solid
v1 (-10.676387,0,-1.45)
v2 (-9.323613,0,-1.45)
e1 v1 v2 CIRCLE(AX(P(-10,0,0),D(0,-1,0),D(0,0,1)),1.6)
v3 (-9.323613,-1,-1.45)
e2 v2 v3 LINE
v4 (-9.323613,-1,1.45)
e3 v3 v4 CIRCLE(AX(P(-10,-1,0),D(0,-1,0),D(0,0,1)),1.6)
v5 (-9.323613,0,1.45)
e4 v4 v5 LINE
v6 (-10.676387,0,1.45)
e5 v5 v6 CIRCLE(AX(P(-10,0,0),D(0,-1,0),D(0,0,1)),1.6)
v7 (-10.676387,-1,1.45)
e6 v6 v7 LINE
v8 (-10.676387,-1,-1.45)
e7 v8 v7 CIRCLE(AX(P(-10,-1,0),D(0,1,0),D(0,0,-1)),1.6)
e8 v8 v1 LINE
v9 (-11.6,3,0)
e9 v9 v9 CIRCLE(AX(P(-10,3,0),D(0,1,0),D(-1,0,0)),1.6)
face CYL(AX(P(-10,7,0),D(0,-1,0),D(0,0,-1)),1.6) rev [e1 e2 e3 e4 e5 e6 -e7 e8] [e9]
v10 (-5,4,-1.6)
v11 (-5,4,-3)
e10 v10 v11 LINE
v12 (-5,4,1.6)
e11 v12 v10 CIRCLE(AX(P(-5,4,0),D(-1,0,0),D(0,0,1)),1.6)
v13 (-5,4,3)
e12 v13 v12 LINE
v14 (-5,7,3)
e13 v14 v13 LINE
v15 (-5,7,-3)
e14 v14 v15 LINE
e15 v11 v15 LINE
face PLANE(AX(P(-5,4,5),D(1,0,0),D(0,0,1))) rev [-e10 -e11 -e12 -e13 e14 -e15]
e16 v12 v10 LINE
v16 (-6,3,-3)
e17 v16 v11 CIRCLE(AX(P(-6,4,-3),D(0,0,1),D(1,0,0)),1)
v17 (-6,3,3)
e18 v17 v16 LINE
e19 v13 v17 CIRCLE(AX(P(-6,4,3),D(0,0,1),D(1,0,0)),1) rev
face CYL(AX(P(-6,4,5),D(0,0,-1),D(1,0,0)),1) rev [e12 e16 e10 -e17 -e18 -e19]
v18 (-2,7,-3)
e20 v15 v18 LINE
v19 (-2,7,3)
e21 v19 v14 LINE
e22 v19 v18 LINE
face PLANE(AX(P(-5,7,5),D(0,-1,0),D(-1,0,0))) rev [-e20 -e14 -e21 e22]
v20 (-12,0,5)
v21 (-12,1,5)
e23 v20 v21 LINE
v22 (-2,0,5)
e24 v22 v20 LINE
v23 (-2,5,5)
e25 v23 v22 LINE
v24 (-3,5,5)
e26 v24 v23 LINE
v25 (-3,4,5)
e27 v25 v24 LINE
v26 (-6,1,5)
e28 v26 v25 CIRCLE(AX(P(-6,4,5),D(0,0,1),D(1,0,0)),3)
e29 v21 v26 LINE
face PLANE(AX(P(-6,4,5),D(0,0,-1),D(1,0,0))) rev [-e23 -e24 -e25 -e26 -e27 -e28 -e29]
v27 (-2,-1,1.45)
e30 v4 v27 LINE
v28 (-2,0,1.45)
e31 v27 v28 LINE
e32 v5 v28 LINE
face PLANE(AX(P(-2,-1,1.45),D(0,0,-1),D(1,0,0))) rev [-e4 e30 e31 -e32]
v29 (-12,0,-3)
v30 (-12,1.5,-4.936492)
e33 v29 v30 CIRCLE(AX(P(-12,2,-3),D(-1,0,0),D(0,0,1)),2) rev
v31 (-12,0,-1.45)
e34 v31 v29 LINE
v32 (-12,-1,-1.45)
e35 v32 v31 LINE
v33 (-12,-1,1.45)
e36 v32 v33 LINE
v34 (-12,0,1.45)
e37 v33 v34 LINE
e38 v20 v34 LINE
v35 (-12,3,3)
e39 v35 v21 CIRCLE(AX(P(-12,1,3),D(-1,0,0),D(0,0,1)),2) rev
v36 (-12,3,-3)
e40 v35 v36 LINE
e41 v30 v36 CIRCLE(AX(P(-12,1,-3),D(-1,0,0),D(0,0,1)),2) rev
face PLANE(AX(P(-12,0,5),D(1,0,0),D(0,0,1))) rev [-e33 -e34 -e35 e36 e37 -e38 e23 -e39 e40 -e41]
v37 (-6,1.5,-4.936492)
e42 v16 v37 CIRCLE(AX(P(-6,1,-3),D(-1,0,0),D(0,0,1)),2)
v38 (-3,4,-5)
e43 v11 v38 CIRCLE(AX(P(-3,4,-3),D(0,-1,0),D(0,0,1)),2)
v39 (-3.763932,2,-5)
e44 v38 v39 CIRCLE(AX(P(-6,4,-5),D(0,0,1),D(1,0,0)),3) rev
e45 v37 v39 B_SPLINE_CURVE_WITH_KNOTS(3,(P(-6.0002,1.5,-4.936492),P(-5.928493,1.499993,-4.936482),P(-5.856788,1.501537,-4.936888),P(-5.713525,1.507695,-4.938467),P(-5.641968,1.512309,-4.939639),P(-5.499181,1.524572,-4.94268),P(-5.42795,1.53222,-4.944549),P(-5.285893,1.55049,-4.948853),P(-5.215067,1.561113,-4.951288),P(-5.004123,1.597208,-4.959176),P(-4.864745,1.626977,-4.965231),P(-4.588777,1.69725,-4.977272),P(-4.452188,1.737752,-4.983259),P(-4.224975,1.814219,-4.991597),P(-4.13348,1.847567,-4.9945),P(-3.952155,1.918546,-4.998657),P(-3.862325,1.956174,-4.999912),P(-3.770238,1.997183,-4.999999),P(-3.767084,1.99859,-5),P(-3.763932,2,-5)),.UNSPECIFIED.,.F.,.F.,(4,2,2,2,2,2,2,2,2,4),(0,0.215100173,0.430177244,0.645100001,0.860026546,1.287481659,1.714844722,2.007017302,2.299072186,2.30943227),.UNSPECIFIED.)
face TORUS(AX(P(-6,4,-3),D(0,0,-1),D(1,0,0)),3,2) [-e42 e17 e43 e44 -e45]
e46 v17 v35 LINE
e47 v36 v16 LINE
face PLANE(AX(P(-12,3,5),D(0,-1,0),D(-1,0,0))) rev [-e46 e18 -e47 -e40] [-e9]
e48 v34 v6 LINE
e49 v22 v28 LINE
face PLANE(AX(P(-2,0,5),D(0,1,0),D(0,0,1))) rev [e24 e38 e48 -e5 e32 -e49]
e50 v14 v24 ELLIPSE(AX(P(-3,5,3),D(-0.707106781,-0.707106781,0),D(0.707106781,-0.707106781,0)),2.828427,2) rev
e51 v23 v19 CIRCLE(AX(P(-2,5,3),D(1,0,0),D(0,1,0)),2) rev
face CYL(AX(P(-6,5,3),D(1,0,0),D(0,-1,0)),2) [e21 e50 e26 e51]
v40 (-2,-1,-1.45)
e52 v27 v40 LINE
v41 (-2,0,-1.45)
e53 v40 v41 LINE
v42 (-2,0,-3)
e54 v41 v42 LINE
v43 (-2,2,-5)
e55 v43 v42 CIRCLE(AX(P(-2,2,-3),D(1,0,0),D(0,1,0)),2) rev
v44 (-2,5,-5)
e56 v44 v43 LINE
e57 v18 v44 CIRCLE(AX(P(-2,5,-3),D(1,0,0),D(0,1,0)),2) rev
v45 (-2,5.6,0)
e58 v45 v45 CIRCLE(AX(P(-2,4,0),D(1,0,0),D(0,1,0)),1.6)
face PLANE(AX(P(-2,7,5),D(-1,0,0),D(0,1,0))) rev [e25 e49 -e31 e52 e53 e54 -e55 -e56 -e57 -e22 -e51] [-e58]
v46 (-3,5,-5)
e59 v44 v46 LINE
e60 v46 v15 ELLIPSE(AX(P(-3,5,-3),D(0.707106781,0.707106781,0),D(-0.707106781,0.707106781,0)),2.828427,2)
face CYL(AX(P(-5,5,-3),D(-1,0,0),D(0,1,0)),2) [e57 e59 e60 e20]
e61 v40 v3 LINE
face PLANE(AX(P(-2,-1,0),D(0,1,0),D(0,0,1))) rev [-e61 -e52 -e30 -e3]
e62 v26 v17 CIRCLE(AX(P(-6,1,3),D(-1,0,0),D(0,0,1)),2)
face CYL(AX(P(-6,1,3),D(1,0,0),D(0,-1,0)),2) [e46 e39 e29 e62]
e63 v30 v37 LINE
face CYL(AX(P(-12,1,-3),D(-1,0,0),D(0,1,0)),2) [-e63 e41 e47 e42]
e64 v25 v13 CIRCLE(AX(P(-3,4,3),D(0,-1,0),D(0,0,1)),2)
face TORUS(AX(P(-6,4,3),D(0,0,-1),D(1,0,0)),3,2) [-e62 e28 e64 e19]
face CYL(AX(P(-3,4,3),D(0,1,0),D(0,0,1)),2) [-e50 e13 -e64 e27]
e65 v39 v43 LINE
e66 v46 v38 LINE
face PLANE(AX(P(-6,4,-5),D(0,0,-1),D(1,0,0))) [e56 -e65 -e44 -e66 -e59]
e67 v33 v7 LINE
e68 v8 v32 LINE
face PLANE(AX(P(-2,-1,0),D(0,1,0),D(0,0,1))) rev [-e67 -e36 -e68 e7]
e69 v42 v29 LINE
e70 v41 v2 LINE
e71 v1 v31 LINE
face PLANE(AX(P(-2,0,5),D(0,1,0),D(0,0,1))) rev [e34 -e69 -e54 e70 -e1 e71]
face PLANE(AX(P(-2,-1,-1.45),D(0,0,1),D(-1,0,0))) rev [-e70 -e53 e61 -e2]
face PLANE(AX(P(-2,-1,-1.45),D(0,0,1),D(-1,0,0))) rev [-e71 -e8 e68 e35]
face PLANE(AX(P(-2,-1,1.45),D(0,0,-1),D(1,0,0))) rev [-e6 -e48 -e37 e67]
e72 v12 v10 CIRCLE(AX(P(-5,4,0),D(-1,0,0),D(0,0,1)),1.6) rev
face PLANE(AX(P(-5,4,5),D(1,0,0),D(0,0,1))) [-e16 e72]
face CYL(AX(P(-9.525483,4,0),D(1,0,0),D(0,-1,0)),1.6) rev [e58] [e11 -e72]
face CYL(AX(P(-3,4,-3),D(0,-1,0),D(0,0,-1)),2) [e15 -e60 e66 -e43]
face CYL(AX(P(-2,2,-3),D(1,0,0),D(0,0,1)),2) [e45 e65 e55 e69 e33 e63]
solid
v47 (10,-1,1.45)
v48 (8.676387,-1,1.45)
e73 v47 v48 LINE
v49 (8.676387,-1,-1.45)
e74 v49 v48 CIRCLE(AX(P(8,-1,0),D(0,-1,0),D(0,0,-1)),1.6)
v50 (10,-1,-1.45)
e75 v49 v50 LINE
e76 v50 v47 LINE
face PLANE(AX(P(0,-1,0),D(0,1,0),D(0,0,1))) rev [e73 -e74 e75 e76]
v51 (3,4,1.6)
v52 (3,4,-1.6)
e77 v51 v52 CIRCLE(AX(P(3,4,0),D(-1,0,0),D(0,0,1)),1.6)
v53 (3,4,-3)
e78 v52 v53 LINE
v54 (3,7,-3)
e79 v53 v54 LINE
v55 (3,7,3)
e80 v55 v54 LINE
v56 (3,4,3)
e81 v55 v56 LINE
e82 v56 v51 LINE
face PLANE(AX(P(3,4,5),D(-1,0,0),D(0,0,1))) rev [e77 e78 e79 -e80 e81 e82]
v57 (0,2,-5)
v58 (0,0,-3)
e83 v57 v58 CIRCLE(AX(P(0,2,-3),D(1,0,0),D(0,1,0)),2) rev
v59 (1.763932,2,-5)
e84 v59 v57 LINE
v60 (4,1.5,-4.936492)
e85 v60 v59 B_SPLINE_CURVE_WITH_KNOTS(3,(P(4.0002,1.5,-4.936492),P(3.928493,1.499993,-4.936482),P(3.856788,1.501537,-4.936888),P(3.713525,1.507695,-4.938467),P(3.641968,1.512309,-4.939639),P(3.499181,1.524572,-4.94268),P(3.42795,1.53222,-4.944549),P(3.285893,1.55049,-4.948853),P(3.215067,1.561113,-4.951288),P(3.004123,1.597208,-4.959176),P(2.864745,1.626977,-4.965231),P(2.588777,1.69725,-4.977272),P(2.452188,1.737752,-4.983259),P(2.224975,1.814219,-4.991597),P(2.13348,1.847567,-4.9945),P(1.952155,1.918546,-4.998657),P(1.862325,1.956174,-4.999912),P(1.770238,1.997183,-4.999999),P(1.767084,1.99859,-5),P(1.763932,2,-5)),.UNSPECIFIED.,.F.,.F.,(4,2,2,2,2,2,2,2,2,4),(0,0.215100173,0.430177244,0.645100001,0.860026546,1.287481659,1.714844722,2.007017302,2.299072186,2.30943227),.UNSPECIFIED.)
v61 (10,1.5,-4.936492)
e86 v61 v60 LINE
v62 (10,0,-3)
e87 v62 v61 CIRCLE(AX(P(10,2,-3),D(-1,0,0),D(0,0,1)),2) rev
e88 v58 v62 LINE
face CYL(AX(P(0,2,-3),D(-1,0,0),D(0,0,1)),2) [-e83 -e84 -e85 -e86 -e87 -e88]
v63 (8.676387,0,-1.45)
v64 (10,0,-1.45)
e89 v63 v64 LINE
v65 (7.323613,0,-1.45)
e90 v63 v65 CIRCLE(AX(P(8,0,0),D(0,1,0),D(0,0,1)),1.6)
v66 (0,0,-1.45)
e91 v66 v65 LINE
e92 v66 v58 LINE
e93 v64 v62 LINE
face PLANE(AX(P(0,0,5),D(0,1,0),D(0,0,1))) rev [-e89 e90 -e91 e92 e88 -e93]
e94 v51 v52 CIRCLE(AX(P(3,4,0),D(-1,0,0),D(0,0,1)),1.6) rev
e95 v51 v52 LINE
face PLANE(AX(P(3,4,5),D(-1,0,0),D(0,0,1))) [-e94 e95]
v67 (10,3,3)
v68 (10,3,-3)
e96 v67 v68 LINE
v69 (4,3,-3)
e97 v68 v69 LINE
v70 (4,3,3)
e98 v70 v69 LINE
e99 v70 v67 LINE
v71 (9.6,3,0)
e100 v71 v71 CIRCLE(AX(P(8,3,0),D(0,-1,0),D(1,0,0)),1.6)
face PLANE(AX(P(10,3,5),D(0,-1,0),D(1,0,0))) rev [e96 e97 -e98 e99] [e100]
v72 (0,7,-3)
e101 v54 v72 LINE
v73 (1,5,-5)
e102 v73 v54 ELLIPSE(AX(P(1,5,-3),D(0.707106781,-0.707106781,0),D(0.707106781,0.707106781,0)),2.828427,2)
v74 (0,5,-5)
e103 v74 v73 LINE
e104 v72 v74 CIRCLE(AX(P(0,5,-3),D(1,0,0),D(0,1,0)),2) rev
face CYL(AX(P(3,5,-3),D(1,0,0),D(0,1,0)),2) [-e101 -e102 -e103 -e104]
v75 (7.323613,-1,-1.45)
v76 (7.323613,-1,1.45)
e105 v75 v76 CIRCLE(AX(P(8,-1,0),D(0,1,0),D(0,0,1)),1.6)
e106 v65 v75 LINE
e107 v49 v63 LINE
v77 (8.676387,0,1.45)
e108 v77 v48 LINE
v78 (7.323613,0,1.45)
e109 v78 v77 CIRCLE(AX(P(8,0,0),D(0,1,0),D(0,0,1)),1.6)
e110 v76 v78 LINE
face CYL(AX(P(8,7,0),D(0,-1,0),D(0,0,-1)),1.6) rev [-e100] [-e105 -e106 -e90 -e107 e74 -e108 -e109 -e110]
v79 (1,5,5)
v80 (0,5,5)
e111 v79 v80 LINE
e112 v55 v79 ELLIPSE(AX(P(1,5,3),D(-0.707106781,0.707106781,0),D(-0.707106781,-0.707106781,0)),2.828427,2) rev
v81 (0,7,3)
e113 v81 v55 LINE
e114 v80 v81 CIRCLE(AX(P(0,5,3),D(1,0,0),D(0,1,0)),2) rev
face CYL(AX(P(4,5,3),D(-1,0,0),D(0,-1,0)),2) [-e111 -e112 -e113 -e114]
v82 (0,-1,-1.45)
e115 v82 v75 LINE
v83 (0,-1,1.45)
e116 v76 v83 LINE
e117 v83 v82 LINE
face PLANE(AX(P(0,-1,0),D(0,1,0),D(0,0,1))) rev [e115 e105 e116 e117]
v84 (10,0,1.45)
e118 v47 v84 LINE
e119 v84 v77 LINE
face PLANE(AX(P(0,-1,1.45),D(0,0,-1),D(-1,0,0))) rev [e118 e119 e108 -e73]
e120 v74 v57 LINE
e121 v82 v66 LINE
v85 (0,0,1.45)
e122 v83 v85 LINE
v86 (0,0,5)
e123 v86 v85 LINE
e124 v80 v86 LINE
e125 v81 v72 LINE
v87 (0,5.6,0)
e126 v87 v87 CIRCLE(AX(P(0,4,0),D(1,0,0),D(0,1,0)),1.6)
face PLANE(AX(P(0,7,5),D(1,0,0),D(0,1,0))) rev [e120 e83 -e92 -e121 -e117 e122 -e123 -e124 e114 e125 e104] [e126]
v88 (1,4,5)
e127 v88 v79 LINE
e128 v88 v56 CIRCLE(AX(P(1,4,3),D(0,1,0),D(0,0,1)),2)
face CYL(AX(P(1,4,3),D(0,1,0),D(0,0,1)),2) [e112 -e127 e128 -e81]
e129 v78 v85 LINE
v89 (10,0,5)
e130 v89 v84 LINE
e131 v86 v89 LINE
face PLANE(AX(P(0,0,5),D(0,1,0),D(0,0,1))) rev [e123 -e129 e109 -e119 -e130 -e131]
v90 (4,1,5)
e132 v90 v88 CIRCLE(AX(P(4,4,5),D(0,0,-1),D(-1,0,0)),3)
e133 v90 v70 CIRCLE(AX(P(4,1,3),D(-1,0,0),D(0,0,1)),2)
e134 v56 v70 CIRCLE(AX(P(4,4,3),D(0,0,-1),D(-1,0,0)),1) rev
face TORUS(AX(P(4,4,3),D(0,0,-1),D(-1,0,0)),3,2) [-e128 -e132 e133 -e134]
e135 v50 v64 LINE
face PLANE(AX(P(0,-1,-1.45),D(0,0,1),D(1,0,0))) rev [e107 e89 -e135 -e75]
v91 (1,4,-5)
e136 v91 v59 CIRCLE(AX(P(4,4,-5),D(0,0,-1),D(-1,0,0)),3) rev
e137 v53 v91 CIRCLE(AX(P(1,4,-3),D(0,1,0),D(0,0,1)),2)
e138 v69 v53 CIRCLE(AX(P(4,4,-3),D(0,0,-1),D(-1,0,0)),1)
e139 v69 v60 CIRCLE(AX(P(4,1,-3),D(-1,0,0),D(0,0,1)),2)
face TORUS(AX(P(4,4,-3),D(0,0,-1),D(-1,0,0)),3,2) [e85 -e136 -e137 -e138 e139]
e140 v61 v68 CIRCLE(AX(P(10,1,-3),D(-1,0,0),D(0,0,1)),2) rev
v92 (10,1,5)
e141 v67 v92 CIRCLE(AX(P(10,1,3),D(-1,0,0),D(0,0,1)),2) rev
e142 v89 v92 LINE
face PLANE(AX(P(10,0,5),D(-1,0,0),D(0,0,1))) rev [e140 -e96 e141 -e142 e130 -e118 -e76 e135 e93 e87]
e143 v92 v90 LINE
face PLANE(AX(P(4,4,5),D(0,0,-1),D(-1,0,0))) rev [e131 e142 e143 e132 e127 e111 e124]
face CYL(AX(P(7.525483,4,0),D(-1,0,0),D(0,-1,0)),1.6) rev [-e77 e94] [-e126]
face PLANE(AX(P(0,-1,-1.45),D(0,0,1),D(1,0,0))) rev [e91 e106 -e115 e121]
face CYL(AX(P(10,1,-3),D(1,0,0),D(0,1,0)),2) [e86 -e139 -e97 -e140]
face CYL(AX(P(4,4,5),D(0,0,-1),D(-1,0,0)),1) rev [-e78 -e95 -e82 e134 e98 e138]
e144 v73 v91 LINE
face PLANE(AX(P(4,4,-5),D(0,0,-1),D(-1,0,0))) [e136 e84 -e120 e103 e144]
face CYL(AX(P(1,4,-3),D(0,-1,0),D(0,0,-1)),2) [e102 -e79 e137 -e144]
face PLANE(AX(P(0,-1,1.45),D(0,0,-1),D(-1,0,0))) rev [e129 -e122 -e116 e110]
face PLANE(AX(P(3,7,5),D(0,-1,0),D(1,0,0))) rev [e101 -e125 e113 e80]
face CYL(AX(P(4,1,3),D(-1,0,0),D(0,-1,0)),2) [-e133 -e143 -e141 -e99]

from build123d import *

# Parameters (mm, degrees)
MAIN_DEPTH               = 5
VERTICALHOLE_DEPTH       = 14.190905958
VERTICALHOLE_DEPTH_BACK  = 3
ESQUISSE2_R              = 1.6
ESQUISSE5_W              = 10
ESQUISSE5_H              = 2.9
MAKERBEAMSUPPORT_DEPTH   = 1
MAKERBEAMHOLE_DEPTH      = 14.190905958
MAKERBEAMHOLE_DEPTH_BACK = 14.190905958
ESQUISSE3_R              = 1.6
FILLET1_R                = 2


with BuildPart() as part:
    # Esquisse1 → Main (new, symmetric)
    with BuildSketch(Plane.XY):
        with BuildLine():
            Line((0, 0), (10, 0))
            Line((10, 0), (10, 3))
            Line((10, 3), (4, 3))
            ThreePointArc((4, 3), (3.292893219, 3.292893219), (3, 4))
            Line((3, 4), (3, 7))
            Line((3, 7), (0, 7))
            Line((0, 7), (0, 0))
        make_face()
    extrude(amount=MAIN_DEPTH, both=True)

    # Esquisse2 → VerticalHole (cut, two sides: drawn at the far end of the back side and taken through both)
    with BuildSketch(Plane.ZY.offset(-VERTICALHOLE_DEPTH_BACK)):
        with Locations(Location((0, 4, 0), (0, 0, 180))):
            Circle(ESQUISSE2_R)
    extrude(amount=VERTICALHOLE_DEPTH + VERTICALHOLE_DEPTH_BACK, mode=Mode.SUBTRACT)

    # Esquisse5 → MakerBeamSupport (add)
    with BuildSketch(Plane(origin=(0, 0, 0), x_dir=(-1, 0, 0), z_dir=(0, -1, 0))):
        with Locations((-5, 0)):
            Rectangle(ESQUISSE5_W, ESQUISSE5_H)
    extrude(amount=MAKERBEAMSUPPORT_DEPTH)

    # Esquisse3 → MakerBeamHole (cut, two sides: drawn at the far end of the back side and taken through both)
    with BuildSketch(Plane.XZ.offset(-MAKERBEAMHOLE_DEPTH_BACK)):
        with Locations(Location((8, 0, 0), (0, 0, 244.992166765))):
            Circle(ESQUISSE3_R)
    extrude(amount=MAKERBEAMHOLE_DEPTH + MAKERBEAMHOLE_DEPTH_BACK, mode=Mode.SUBTRACT)

    # Fillet1
    # the kernel refuses this fillet: 2 mm, written as the material it takes off along each edge
    with BuildSketch(Plane(origin=(3, 4, -5), x_dir=(-1, 0, 0), z_dir=(0, 1, 0))) as fillet1_piece_1:
        with BuildLine():
            CenterArc((FILLET1_R, FILLET1_R), FILLET1_R, 180, 90)
            Line((0, FILLET1_R), (0, 0))
            Line((0, 0), (FILLET1_R, 0))
        make_face()
    extrude(amount=8, mode=Mode.SUBTRACT)
    with BuildSketch(Plane(origin=(4, 4, -5), x_dir=(0, -1, 0), z_dir=(1, 0, 0))) as fillet1_piece_2:
        with BuildLine():
            CenterArc((1 + FILLET1_R, -FILLET1_R), FILLET1_R, 90, 90)
            Line((1, -FILLET1_R), (1, 0))
            Line((1, 0), (1 + FILLET1_R, 0))
        make_face()
    revolve(axis=Axis((4, 4, -5), (0, 0, -1)), revolution_arc=90, mode=Mode.SUBTRACT)
    with BuildSketch(Plane(origin=(3, 4, 5), x_dir=(-1, 0, 0), z_dir=(0, 1, 0))) as fillet1_piece_3:
        with BuildLine():
            CenterArc((FILLET1_R, -FILLET1_R), FILLET1_R, 90, 90)
            Line((0, -FILLET1_R), (0, 0))
            Line((0, 0), (FILLET1_R, 0))
        make_face()
    extrude(amount=8, mode=Mode.SUBTRACT)
    with BuildSketch(Plane(origin=(4, 4, 5), x_dir=(0, -1, 0), z_dir=(1, 0, 0))) as fillet1_piece_4:
        with BuildLine():
            CenterArc((1 + FILLET1_R, FILLET1_R), FILLET1_R, 180, 90)
            Line((1, FILLET1_R), (1, 0))
            Line((1, 0), (1 + FILLET1_R, 0))
        make_face()
    revolve(axis=Axis((4, 4, 5), (0, 0, -1)), revolution_arc=90, mode=Mode.SUBTRACT)
    with BuildSketch(Plane(origin=(15, 3, -5), x_dir=(0, -1, 0), z_dir=(-1, 0, 0)), Plane(origin=(15, 3, 5), x_dir=(0, 0, -1), z_dir=(-1, 0, 0))) as fillet1_piece_5:
        with BuildLine():
            CenterArc((FILLET1_R, FILLET1_R), FILLET1_R, 180, 90)
            Line((0, FILLET1_R), (0, 0))
            Line((0, 0), (FILLET1_R, 0))
        make_face()
    extrude(amount=11, mode=Mode.SUBTRACT)
    with BuildSketch(Plane(origin=(8, 7, -5), x_dir=(0, -1, 0), z_dir=(-1, 0, 0))) as fillet1_piece_6:
        with BuildLine():
            CenterArc((FILLET1_R, FILLET1_R), FILLET1_R, 180, 90)
            Line((0, FILLET1_R), (0, 0))
            Line((0, 0), (FILLET1_R, 0))
        make_face()
    extrude(amount=13, mode=Mode.SUBTRACT)
    with BuildSketch(Plane(origin=(8, 7, 5), x_dir=(0, -1, 0), z_dir=(-1, 0, 0))) as fillet1_piece_7:
        with BuildLine():
            CenterArc((FILLET1_R, -FILLET1_R), FILLET1_R, 90, 90)
            Line((0, -FILLET1_R), (0, 0))
            Line((0, 0), (FILLET1_R, 0))
        make_face()
    extrude(amount=13, mode=Mode.SUBTRACT)
    with BuildSketch(Plane(origin=(-5, 0, -5), x_dir=(0, 0, 1), z_dir=(1, 0, 0))) as fillet1_piece_8:
        with BuildLine():
            CenterArc((FILLET1_R, -FILLET1_R), FILLET1_R, 90, 90)
            Line((0, -FILLET1_R), (0, 0))
            Line((0, 0), (FILLET1_R, 0))
        make_face()
    extrude(amount=20, mode=Mode.SUBTRACT)


with BuildPart() as body_2:
    # Mirror2: mirrored copy
    add(part.part.mirror(Plane.ZY.offset(1)))


solid = Compound([part.part, body_2.part])
